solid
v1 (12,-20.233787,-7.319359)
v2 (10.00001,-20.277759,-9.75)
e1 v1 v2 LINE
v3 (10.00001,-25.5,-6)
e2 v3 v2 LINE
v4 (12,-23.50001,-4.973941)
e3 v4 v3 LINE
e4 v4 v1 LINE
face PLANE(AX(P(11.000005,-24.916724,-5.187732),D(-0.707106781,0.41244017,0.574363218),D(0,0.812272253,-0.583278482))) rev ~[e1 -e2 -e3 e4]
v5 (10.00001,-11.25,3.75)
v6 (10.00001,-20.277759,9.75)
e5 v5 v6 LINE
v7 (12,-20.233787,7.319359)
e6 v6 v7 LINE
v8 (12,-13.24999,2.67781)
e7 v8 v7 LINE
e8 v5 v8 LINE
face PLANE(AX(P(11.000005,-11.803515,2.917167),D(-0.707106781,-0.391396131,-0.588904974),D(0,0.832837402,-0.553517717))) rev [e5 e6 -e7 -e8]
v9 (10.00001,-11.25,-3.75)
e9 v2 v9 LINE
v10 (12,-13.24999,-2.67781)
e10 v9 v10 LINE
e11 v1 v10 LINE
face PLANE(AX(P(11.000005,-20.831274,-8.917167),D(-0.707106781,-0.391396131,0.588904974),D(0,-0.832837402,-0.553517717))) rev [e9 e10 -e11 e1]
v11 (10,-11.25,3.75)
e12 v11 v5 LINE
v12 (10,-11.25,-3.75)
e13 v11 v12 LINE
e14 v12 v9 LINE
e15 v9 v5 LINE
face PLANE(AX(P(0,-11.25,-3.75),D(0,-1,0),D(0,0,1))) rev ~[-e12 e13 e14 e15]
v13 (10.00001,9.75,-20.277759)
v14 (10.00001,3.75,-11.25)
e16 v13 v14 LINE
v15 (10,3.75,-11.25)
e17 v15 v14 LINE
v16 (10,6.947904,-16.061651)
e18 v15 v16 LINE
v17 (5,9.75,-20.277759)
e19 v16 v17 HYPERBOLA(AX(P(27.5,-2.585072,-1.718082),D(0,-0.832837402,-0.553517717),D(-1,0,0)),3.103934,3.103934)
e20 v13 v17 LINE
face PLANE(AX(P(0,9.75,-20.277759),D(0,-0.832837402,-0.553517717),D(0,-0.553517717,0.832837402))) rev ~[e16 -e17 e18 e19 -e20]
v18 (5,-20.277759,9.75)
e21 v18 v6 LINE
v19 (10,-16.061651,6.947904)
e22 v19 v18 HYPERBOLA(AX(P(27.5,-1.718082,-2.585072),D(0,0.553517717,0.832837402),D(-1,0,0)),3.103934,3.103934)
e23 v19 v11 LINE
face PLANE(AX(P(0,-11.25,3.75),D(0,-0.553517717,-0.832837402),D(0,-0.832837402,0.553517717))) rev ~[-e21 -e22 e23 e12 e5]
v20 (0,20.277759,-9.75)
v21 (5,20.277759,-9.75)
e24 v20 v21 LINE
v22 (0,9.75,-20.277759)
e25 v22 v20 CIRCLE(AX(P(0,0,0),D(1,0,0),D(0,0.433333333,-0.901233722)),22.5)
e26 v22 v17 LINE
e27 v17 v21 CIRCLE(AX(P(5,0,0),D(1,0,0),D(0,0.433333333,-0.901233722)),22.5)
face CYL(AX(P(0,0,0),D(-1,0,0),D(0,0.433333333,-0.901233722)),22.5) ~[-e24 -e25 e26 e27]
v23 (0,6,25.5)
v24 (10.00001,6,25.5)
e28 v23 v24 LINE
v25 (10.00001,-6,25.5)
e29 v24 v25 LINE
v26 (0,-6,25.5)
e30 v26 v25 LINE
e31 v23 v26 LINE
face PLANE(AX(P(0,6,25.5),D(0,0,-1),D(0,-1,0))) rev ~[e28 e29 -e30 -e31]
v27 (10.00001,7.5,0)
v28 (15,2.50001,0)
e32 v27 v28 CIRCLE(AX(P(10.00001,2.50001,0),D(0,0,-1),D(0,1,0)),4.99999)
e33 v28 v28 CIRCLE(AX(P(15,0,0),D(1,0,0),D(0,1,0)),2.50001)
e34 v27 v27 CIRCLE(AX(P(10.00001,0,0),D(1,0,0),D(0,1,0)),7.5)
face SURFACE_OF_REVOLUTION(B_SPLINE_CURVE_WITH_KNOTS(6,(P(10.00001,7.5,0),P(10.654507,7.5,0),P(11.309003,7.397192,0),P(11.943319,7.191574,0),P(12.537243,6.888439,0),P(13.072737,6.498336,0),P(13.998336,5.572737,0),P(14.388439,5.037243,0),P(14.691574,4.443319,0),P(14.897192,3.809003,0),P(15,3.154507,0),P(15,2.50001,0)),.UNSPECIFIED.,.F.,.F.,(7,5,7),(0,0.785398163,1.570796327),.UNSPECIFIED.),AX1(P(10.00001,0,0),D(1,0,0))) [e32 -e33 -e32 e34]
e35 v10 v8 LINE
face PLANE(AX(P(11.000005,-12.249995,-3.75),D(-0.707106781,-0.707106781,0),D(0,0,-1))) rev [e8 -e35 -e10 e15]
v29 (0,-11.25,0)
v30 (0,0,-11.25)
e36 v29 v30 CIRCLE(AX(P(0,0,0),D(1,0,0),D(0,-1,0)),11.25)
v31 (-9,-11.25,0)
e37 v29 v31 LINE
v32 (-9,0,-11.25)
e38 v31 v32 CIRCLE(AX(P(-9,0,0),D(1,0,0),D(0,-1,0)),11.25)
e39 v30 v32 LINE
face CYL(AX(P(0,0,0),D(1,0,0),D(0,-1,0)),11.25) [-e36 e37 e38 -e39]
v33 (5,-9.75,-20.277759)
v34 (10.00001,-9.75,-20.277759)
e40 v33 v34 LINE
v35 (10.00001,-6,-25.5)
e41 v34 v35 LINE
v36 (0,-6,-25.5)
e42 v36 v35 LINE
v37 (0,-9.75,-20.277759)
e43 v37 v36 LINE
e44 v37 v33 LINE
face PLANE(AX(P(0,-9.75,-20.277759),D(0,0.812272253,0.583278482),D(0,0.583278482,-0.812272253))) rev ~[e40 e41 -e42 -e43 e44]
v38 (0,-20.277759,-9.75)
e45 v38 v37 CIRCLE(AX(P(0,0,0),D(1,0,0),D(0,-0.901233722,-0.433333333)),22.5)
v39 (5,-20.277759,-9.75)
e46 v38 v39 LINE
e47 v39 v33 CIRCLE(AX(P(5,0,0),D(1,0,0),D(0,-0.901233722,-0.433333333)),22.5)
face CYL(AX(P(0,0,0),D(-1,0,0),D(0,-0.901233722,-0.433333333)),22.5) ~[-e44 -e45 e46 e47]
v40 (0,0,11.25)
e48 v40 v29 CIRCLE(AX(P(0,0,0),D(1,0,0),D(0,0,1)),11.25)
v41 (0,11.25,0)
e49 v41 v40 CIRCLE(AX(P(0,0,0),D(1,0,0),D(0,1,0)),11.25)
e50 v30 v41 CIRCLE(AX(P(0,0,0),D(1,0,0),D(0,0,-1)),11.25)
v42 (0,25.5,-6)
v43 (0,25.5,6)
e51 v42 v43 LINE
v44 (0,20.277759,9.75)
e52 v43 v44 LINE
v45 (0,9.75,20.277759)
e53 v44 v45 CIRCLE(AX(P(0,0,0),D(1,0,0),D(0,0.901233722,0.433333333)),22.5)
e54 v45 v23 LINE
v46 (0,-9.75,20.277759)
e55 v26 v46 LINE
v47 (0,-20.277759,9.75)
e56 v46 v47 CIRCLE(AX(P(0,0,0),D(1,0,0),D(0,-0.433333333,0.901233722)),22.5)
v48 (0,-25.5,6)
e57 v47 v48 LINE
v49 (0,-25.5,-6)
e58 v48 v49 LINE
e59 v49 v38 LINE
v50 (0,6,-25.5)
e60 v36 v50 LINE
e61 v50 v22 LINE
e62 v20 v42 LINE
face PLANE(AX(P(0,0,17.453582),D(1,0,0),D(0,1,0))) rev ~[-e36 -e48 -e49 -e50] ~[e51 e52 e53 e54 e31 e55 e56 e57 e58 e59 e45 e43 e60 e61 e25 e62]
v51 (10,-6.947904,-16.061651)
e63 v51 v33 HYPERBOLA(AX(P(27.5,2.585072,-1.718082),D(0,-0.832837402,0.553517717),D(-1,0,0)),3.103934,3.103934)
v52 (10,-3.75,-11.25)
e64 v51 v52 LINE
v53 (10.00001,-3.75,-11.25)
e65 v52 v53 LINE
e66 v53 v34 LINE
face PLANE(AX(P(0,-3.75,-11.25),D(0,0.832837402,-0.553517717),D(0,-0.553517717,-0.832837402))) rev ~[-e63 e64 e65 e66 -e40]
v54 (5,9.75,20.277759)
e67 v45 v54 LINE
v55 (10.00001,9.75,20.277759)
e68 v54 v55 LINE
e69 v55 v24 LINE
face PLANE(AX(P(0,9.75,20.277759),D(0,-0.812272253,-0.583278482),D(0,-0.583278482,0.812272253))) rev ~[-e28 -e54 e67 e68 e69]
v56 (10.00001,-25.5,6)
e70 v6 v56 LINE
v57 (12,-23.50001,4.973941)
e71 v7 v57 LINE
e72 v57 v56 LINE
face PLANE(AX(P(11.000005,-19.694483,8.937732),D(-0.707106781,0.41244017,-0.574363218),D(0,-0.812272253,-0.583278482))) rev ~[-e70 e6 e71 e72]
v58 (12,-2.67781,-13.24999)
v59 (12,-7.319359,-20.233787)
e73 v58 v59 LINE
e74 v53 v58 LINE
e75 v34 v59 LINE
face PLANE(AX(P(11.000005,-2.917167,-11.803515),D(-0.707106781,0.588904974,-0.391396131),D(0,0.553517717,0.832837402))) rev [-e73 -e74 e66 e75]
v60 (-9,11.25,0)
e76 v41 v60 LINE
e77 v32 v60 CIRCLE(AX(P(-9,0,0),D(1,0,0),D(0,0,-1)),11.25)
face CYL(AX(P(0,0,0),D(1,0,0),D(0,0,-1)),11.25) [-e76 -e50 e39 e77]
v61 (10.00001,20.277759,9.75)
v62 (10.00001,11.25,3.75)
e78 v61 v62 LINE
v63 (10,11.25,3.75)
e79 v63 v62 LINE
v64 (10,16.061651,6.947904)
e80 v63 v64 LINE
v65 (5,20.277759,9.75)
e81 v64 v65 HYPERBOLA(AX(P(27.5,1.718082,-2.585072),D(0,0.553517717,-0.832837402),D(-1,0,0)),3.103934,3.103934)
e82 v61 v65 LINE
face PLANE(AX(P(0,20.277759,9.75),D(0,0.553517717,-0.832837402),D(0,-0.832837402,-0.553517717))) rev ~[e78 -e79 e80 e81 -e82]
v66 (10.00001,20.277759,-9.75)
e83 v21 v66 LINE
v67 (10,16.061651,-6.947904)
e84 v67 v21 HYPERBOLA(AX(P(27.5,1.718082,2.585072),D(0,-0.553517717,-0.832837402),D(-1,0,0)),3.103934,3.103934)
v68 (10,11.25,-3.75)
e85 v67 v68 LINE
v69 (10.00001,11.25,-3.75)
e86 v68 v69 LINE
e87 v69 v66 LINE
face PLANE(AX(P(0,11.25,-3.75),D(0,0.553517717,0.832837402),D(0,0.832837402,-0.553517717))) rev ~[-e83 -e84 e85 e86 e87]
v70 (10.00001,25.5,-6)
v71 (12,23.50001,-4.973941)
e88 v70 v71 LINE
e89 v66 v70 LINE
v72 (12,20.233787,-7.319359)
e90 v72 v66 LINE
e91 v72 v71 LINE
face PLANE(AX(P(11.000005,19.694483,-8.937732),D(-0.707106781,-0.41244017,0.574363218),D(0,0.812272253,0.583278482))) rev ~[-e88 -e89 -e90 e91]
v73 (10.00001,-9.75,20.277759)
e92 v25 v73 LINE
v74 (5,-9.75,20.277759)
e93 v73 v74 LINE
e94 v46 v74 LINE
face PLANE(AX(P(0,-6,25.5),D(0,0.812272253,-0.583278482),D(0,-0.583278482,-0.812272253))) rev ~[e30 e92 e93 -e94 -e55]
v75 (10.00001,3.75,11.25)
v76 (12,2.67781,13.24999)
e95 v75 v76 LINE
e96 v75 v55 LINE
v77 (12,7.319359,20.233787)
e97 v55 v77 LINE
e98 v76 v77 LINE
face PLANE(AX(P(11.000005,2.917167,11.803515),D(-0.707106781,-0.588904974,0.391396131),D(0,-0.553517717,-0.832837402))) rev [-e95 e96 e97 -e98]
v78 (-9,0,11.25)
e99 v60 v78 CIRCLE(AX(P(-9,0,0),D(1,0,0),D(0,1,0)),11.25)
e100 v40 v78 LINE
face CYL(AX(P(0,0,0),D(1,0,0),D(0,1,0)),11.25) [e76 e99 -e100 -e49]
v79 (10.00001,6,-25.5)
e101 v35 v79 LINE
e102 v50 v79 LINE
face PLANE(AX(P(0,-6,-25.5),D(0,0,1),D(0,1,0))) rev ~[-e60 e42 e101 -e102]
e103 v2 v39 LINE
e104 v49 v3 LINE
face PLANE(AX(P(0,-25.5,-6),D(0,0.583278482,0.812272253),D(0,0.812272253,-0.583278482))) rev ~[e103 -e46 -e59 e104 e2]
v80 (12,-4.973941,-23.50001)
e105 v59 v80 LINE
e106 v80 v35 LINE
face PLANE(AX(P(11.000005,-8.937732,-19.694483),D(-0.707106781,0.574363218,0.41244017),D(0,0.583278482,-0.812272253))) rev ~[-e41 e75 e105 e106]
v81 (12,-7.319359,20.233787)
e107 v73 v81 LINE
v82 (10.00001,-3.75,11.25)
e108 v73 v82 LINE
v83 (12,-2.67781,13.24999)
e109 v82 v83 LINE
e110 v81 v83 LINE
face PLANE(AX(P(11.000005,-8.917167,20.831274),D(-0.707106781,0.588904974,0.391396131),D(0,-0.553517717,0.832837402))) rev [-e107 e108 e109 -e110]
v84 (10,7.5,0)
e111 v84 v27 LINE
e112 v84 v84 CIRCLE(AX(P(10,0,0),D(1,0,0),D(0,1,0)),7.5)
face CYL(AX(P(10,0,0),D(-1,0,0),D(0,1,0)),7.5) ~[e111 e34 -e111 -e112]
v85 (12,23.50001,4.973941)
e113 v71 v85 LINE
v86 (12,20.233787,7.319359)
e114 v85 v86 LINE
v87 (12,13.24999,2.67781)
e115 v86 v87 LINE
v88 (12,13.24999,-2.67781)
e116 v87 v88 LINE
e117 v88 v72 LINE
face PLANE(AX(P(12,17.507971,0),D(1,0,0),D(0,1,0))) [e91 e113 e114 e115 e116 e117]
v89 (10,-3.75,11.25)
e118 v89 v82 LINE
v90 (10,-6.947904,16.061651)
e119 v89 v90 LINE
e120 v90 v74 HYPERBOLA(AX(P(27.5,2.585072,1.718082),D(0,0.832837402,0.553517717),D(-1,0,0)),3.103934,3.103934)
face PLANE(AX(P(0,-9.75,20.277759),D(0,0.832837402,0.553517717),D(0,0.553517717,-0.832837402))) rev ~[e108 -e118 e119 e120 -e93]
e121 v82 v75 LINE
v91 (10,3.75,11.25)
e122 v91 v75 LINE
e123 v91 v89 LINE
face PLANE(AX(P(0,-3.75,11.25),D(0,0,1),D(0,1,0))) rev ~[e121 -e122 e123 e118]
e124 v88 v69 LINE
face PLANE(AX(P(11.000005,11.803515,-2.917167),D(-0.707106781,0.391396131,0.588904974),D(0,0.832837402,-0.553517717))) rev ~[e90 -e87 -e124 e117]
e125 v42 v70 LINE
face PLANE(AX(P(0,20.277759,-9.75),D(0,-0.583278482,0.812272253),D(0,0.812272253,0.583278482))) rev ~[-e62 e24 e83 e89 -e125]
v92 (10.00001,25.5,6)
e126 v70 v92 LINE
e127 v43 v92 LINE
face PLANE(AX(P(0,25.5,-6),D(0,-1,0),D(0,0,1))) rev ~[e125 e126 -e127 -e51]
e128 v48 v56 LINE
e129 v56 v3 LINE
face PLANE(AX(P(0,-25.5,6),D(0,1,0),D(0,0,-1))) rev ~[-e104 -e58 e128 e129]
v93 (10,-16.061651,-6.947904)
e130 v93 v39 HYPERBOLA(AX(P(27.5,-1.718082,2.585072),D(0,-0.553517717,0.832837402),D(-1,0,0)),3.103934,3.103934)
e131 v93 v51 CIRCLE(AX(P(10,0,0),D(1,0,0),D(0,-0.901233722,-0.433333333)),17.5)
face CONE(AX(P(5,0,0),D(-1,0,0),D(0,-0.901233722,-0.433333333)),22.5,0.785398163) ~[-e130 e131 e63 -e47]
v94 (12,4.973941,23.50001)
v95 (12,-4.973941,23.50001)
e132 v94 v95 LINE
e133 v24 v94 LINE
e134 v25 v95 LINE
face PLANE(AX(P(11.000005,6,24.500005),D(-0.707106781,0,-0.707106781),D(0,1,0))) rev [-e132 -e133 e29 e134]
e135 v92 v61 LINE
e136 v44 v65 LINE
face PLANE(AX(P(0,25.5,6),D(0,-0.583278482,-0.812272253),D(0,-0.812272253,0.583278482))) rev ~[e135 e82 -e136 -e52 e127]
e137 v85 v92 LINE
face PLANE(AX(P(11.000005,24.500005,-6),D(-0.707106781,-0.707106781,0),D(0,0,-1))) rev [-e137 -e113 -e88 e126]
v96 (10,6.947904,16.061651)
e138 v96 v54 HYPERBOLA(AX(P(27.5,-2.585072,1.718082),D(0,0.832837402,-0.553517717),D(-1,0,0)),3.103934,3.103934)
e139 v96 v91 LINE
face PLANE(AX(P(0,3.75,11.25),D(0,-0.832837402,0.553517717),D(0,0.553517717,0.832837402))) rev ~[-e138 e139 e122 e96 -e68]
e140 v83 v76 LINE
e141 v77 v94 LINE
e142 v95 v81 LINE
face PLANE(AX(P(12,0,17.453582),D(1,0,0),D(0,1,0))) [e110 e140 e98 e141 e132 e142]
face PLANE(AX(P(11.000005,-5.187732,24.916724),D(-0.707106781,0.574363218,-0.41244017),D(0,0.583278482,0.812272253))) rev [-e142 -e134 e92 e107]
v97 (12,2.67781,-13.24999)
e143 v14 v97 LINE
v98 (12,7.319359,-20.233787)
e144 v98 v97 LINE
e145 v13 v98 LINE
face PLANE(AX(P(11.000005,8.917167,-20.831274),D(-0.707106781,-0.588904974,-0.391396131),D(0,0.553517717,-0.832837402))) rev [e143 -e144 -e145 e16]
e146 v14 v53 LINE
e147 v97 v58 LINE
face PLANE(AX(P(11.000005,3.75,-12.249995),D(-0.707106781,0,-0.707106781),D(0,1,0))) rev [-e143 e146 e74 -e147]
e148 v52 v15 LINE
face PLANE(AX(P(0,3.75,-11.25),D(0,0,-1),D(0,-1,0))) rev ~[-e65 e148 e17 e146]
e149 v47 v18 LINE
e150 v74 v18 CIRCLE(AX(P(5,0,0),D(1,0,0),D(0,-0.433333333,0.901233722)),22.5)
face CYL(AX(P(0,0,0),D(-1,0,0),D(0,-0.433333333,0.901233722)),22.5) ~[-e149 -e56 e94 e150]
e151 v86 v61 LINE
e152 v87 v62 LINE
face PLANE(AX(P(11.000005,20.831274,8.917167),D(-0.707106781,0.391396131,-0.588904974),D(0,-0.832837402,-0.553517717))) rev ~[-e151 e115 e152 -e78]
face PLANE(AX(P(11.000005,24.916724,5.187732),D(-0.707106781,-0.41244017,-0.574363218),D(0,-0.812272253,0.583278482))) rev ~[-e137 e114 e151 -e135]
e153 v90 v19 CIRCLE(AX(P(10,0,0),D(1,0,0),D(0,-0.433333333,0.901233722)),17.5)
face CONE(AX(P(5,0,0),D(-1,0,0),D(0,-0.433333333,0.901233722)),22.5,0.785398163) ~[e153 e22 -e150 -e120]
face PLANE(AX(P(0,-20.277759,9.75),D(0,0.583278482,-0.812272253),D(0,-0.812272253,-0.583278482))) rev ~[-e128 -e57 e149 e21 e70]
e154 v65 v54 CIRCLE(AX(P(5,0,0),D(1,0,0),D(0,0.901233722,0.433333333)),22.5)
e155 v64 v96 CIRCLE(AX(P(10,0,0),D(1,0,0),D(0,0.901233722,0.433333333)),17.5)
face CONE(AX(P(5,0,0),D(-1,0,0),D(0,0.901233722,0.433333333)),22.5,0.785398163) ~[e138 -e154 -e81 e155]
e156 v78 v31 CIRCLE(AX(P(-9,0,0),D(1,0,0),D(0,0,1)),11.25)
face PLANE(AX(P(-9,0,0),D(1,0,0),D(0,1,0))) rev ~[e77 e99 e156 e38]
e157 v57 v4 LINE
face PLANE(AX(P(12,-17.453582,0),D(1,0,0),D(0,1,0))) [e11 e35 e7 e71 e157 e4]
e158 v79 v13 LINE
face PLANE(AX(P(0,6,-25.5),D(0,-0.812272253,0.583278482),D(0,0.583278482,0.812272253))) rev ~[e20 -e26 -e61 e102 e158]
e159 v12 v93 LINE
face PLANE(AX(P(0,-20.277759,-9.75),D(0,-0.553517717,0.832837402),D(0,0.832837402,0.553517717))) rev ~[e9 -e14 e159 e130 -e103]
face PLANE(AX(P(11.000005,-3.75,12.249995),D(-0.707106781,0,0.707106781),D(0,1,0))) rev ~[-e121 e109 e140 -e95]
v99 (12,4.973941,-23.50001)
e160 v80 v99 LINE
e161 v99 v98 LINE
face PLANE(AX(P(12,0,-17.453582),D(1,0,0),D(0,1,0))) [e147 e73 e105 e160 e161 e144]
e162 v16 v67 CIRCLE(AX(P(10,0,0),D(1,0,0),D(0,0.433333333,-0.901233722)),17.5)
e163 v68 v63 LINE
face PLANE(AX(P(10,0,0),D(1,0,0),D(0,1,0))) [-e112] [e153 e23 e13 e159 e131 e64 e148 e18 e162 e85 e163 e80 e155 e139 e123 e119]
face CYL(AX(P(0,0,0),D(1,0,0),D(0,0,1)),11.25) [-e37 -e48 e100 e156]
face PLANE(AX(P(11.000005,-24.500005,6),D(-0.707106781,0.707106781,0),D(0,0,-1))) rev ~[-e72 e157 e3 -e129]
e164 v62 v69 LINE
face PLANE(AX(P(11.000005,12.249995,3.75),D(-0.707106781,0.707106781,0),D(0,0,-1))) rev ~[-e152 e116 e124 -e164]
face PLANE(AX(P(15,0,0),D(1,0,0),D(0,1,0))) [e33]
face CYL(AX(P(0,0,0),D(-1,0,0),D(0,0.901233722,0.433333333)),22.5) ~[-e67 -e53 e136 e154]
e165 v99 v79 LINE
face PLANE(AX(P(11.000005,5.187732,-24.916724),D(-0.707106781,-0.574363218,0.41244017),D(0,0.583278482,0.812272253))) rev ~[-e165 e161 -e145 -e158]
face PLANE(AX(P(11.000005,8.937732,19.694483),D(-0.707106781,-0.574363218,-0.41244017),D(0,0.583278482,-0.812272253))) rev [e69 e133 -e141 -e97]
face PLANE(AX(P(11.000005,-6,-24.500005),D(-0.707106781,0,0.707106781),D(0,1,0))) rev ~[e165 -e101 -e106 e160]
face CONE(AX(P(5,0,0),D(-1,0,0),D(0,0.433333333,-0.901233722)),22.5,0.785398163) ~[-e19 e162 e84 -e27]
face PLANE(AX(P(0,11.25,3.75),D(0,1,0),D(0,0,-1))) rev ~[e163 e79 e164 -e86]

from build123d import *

# Parameters (mm, degrees)
F1_DEPTH = 10
F2_DEPTH = 12
F3_SIZE  = 5
F4_SIZE  = 1.99999
F5_R     = 7.5
F6_DEPTH = 5
F7_R     = 4.99999
F9_DEPTH = 9


# Not quite as in the source:
# - a fillet or chamfer is up to 0.001 mm smaller than in the source, because OpenCascade refuses the exact size
# - a feature names something its author has since deleted; it is built from what else it names


with BuildPart() as f1:
    # F0 (on Right) → F1 (new body)
    with BuildSketch(Plane.YZ):
        with BuildLine():
            Line((11.25, 3.75), (20.2777587519, 9.75))
            ThreePointArc((20.2777587519, 9.75), (15.9099025767, 15.9099025767), (9.75, 20.2777587519))
            Line((9.75, 20.2777587519), (3.75, 11.25))
            Line((3.75, 11.25), (0, 11.25))
            Line((0, 11.25), (-3.75, 11.25))
            Line((-3.75, 11.25), (-9.75, 20.2777587519))
            ThreePointArc((-9.75, 20.2777587519), (-15.9099025767, 15.9099025767), (-20.2777587519, 9.75))
            Line((-20.2777587519, 9.75), (-11.25, 3.75))
            Line((-11.25, 3.75), (-11.25, 0))
            Line((-11.25, 0), (-11.25, -3.75))
            Line((-11.25, -3.75), (-20.2777587519, -9.75))
            ThreePointArc((-20.2777587519, -9.75), (-15.9099025767, -15.9099025767), (-9.75, -20.2777587519))
            Line((-9.75, -20.2777587519), (-3.75, -11.25))
            Line((-3.75, -11.25), (0, -11.25))
            Line((0, -11.25), (3.75, -11.25))
            Line((3.75, -11.25), (9.75, -20.2777587519))
            ThreePointArc((9.75, -20.2777587519), (15.9099025767, -15.9099025767), (20.2777587519, -9.75))
            Line((20.2777587519, -9.75), (11.25, -3.75))
            Line((11.25, -3.75), (11.25, 0))
            Line((11.25, 0), (11.25, 3.75))
        make_face()
    extrude(amount=F1_DEPTH)

    # F0 (on Right) → F2 (join)
    with BuildSketch(Plane.YZ):
        with BuildLine():
            Line((3.75, 11.25), (9.75, 20.2777587519))
            ThreePointArc((9.75, 20.2777587519), (0, 22.5), (-9.75, 20.2777587519))
            Line((-9.75, 20.2777587519), (-3.75, 11.25))
            Line((-3.75, 11.25), (0, 11.25))
            Line((0, 11.25), (3.75, 11.25))
        make_face()
        with BuildLine():
            ThreePointArc((-9.75, 20.2777587519), (0, 22.5), (9.75, 20.2777587519))
            Line((9.75, 20.2777587519), (6, 25.5))
            Line((6, 25.5), (0, 25.5))
            Line((0, 25.5), (-6, 25.5))
            Line((-6, 25.5), (-9.75, 20.2777587519))
        make_face()
        with BuildLine():
            Line((-11.25, 3.75), (-20.2777587519, 9.75))
            ThreePointArc((-20.2777587519, 9.75), (-22.5, 0), (-20.2777587519, -9.75))
            Line((-20.2777587519, -9.75), (-11.25, -3.75))
            Line((-11.25, -3.75), (-11.25, 0))
            Line((-11.25, 0), (-11.25, 3.75))
        make_face()
        with BuildLine():
            ThreePointArc((-20.2777587519, -9.75), (-22.5, 0), (-20.2777587519, 9.75))
            Line((-20.2777587519, 9.75), (-25.5, 6))
            Line((-25.5, 6), (-25.5, 0))
            Line((-25.5, 0), (-25.5, -6))
            Line((-25.5, -6), (-20.2777587519, -9.75))
        make_face()
        with BuildLine():
            ThreePointArc((-9.75, -20.2777587519), (0, -22.5), (9.75, -20.2777587519))
            Line((9.75, -20.2777587519), (3.75, -11.25))
            Line((3.75, -11.25), (0, -11.25))
            Line((0, -11.25), (-3.75, -11.25))
            Line((-3.75, -11.25), (-9.75, -20.2777587519))
        make_face()
        with BuildLine():
            Line((6, -25.5), (9.75, -20.2777587519))
            ThreePointArc((9.75, -20.2777587519), (0, -22.5), (-9.75, -20.2777587519))
            Line((-9.75, -20.2777587519), (-6, -25.5))
            Line((-6, -25.5), (0, -25.5))
            Line((0, -25.5), (6, -25.5))
        make_face()
        with BuildLine():
            ThreePointArc((20.2777587519, -9.75), (21.93740609, -5.0000214041), (22.5, 0))
            ThreePointArc((22.5, 0), (21.93740609, 5.0000214041), (20.2777587519, 9.75))
            Line((20.2777587519, 9.75), (11.25, 3.75))
            Line((11.25, 3.75), (11.25, 0))
            Line((11.25, 0), (11.25, -3.75))
            Line((11.25, -3.75), (20.2777587519, -9.75))
        make_face()
        with BuildLine():
            ThreePointArc((20.2777587519, 9.75), (21.93740609, 5.0000214041), (22.5, 0))
            ThreePointArc((22.5, 0), (21.93740609, -5.0000214041), (20.2777587519, -9.75))
            Line((20.2777587519, -9.75), (25.5, -6))
            Line((25.5, -6), (25.5, 0))
            Line((25.5, 0), (25.5, 6))
            Line((25.5, 6), (20.2777587519, 9.75))
        make_face()
    extrude(amount=F2_DEPTH)

    # F3
    f3_edges = [f1.edges().sort_by_distance(p)[0] for p in [
        (10, 15.909903, 15.909903),
        (10, -15.909903, 15.909903),
        (10, -15.909903, -15.909903),
        (10, 15.909903, -15.909903),
    ]]
    chamfer(f3_edges, length=F3_SIZE)

    # F4 (size 2 in the source; OpenCascade refuses exactly that, so slightly less here)
    f4_edges = [f1.edges().sort_by_distance(p)[0] for p in [
        (12, 0, 25.5),
        (12, -7.875, 22.888879),
        (12, 7.875, 22.888879),
        (12, -6.75, 15.763879),
        (12, 6.75, 15.763879),
        (12, 0, 11.25),
        (12, -15.763879, 6.75),
        (12, -22.888879, 7.875),
        (12, -25.5, 0),
        (12, -22.888879, -7.875),
        (12, -15.763879, -6.75),
        (12, -11.25, 0),
        (12, 0, -11.25),
        (12, -6.75, -15.763879),
        (12, -7.875, -22.888879),
        (12, 6.75, -15.763879),
        (12, 0, -25.5),
        (12, 7.875, -22.888879),
        (12, 15.763879, -6.75),
        (12, 11.25, 0),
        (12, 15.763879, 6.75),
        (12, 22.888879, 7.875),
        (12, 25.5, 0),
        (12, 22.888879, -7.875),
    ]]
    chamfer(f4_edges, length=F4_SIZE)

    # F5 (on face) → F6 (join)
    with BuildSketch(Plane.YZ.offset(10)):
        Circle(F5_R)
    extrude(amount=F6_DEPTH)

    # F7 (radius 5 in the source; OpenCascade refuses exactly that, so slightly less here)
    f7_edges = [f1.edges().sort_by_distance(p)[0] for p in [
        (15, -7.5, 0),
    ]]
    fillet(f7_edges, radius=F7_R)

    # F8 (on face) → F9 (join)
    with BuildSketch(Plane.YZ):
        with BuildLine():
            ThreePointArc((0, -11.25), (7.9549512883, -7.9549512883), (11.25, 0))
            ThreePointArc((11.25, 0), (7.9549512883, 7.9549512883), (0, 11.25))
            ThreePointArc((0, 11.25), (-7.9549512883, 7.9549512883), (-11.25, 0))
            ThreePointArc((-11.25, 0), (-7.9549512883, -7.9549512883), (0, -11.25))
        make_face()
    extrude(amount=-F9_DEPTH)


solid = f1.part
